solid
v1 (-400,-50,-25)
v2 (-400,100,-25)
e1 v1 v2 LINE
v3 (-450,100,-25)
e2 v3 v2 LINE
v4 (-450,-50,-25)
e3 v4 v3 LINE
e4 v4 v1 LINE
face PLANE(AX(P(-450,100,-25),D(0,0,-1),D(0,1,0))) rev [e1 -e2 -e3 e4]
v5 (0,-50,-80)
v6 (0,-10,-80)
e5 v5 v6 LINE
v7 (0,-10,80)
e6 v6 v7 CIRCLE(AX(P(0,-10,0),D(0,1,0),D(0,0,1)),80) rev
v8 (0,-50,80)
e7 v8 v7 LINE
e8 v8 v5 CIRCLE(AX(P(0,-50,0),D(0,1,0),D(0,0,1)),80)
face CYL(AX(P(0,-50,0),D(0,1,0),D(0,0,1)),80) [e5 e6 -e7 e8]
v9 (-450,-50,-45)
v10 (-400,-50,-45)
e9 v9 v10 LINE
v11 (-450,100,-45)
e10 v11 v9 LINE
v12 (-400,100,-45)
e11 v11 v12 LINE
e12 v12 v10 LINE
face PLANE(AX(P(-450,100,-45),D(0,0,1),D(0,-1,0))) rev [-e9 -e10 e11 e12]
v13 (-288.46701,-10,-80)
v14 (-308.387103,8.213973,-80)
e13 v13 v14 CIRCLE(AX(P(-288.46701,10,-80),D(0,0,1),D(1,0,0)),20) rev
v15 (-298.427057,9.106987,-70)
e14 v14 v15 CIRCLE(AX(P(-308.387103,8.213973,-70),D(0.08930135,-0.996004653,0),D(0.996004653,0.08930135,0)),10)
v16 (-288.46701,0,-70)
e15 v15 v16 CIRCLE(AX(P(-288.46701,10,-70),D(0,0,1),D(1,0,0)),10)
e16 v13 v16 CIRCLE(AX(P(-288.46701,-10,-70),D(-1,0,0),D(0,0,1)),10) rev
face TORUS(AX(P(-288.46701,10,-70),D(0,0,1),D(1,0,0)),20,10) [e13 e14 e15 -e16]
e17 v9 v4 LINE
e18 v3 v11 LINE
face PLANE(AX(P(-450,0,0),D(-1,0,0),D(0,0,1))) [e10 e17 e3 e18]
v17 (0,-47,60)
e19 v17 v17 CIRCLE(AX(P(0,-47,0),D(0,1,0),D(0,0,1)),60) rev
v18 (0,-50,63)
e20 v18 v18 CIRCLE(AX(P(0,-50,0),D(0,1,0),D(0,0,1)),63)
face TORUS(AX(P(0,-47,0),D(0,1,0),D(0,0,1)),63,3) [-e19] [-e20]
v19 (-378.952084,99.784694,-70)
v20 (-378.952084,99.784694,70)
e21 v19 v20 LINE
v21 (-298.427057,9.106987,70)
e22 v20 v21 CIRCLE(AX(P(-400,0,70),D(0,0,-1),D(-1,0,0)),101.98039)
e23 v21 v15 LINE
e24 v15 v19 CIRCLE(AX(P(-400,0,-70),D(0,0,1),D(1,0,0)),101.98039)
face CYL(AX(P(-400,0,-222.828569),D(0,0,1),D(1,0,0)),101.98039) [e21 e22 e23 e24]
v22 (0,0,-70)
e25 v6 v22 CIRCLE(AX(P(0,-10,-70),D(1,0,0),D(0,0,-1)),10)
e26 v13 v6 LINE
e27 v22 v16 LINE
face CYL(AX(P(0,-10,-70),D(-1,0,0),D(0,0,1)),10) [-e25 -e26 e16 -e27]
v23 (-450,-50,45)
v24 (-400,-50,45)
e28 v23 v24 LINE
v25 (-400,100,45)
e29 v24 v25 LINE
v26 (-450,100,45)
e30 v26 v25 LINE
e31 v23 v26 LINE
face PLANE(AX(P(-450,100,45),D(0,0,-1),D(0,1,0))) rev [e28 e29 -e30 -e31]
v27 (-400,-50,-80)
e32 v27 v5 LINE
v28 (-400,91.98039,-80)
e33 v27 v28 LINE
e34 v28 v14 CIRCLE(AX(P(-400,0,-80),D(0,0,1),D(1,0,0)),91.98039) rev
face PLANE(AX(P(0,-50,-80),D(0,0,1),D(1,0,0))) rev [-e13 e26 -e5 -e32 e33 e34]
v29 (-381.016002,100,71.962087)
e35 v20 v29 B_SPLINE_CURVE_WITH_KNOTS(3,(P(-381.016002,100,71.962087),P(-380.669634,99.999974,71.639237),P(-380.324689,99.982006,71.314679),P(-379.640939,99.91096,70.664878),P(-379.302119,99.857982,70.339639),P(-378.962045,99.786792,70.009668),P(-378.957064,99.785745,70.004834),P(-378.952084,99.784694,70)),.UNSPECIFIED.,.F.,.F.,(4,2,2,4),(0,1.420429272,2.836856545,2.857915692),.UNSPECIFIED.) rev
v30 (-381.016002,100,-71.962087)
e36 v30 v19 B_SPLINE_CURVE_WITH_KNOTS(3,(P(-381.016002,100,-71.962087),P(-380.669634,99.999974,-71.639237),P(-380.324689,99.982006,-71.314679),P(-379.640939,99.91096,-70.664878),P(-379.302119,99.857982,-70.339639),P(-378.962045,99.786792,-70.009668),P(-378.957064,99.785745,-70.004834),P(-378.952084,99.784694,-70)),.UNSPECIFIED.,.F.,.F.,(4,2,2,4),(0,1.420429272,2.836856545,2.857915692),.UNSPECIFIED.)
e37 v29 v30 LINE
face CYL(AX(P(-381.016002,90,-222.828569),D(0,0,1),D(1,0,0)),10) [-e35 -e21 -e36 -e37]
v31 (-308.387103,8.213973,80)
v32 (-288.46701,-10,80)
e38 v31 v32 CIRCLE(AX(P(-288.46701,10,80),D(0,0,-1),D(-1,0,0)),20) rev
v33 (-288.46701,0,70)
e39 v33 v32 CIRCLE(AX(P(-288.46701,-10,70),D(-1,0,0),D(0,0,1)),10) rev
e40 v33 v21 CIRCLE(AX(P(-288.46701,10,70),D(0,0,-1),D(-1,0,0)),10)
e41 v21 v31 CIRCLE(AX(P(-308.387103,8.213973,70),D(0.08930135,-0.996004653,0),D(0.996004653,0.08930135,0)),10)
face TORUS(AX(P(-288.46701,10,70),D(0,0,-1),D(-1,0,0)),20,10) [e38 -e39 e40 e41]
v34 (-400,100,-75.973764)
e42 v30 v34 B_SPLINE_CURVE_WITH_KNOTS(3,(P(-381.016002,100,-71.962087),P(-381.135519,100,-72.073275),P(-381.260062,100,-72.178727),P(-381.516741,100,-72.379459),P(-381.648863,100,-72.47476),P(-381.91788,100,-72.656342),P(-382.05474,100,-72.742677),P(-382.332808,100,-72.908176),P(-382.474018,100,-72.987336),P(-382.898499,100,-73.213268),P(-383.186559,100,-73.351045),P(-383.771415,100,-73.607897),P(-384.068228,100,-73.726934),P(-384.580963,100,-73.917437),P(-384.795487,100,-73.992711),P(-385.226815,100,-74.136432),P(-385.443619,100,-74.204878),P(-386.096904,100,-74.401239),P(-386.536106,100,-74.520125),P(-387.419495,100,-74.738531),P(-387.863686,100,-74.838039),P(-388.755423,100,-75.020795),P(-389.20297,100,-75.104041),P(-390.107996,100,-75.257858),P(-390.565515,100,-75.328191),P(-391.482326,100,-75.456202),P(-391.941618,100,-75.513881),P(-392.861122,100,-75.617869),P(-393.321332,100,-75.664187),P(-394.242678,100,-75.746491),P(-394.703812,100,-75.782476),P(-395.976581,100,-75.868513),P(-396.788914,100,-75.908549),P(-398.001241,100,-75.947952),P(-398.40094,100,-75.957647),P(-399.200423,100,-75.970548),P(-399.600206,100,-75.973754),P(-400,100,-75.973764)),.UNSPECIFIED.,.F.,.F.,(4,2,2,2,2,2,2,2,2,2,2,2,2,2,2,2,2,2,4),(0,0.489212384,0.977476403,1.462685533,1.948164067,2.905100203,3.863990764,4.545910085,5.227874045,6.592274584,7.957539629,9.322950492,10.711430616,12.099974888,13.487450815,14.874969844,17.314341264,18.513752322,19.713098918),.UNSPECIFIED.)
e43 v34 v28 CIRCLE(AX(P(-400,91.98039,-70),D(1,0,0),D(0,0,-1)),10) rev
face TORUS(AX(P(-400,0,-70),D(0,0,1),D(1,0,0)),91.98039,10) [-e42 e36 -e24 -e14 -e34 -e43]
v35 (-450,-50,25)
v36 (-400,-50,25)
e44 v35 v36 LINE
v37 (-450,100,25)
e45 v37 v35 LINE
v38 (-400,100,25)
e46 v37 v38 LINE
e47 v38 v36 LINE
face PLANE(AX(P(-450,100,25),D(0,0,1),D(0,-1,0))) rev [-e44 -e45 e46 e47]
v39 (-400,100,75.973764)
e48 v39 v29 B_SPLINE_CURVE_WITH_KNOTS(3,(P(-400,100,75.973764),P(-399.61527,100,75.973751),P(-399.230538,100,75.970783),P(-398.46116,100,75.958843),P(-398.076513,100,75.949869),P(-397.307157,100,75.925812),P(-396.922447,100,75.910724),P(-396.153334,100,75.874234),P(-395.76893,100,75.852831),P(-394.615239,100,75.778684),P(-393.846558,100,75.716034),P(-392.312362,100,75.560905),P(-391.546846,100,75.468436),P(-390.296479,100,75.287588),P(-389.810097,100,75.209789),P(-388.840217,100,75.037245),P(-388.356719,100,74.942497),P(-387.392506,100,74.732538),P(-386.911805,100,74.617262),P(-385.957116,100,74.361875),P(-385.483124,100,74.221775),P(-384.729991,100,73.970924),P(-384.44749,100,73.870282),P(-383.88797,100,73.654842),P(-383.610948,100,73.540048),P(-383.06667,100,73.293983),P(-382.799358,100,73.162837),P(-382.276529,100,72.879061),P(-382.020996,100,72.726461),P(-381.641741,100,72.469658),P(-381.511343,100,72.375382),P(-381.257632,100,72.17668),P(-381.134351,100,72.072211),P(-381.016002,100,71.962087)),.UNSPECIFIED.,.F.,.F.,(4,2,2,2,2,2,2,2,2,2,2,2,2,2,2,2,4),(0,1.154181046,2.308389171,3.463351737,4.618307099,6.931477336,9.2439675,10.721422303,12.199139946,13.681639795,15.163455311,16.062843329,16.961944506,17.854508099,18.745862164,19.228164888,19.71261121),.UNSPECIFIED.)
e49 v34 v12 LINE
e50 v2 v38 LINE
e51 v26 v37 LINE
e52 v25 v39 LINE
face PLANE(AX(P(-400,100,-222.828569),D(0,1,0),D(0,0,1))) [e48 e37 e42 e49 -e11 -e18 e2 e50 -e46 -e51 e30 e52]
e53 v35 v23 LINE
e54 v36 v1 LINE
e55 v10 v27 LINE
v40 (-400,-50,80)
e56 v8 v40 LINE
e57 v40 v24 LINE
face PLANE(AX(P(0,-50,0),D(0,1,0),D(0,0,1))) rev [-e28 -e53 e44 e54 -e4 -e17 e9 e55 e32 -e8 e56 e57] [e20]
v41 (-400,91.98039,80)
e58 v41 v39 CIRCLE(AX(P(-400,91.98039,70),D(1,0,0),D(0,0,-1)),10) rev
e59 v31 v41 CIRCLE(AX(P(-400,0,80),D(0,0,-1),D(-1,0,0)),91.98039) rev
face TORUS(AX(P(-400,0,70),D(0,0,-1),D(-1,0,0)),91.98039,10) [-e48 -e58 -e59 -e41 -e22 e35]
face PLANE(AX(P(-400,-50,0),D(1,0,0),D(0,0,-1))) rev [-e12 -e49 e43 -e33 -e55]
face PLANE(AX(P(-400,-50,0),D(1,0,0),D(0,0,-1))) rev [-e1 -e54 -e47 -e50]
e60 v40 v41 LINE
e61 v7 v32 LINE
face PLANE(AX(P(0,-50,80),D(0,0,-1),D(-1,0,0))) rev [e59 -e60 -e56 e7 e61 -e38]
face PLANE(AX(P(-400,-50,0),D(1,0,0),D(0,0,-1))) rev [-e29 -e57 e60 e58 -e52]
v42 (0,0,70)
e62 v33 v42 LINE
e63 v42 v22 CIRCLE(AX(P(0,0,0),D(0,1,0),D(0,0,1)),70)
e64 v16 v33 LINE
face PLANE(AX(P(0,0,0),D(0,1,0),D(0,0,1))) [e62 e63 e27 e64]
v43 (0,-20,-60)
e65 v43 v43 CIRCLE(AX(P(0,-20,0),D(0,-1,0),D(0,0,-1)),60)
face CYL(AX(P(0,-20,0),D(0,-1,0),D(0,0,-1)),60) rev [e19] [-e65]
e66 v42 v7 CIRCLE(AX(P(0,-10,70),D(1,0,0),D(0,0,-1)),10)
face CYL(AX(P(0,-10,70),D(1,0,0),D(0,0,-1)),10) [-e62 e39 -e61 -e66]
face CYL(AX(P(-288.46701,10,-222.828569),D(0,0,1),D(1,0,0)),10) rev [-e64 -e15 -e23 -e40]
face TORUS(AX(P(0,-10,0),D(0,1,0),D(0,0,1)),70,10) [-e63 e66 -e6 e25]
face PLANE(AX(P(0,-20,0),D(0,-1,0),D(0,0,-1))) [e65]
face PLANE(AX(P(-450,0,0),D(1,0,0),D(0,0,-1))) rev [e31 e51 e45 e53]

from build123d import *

# Parameters (mm, degrees)
CROQUIS1_R              = 80
SALIENTE_EXTRUIR1_DEPTH = 50
SALIENTE_EXTRUIR2_DEPTH = 160
REDONDEO1_R             = 10
SALIENTE_EXTRUIR3_DEPTH = 50
CROQUIS4_R              = 60
CORTAR_EXTRUIR1_DEPTH   = 30
REDONDEO2_R             = 3


with BuildPart() as part:
    # Croquis1 → Saliente-Extruir1 (new body)
    with BuildSketch(Plane(origin=(0, 0, 0), x_dir=(1, 0, 0), z_dir=(0, 1, 0))):
        Circle(CROQUIS1_R)
        with BuildLine():
            Line((-400, -80), (0, -80))
            ThreePointArc((-1.47e-14, -80), (-80, 9.8e-15), (4.9e-15, 80))
            Line((0, 80), (-400, 80))
            Line((-400, 80), (-400, -80))
        make_face()
    extrude(amount=-SALIENTE_EXTRUIR1_DEPTH)

    # Croquis2 → Saliente-Extruir2 (add)
    with BuildSketch(Plane.XY.offset(80)):
        with BuildLine():
            Line((-400, 0), (-400, 100))
            Line((-400, 100), (-380, 100))
            ThreePointArc((-380, 100), (-321.1342666126881, 64.65443602167947), (-298.01960972814436, 0))
            Line((-298.01960972814436, 0), (-400, 0))
        make_face()
    extrude(amount=-SALIENTE_EXTRUIR2_DEPTH)

    # Redondeo1
    # the kernel refuses this fillet: 10 mm, written as the material it adds along each edge
    with BuildSketch(Plane(origin=(-298.01960972814436, -1.78e-15, 80), x_dir=(-0.04469534055522645, 0.9990006639300358, 0), z_dir=(0, 0, -1))) as redondeo1_piece_1:
        with BuildLine():
            CenterArc((9.563049951863276, 9.990006639300384), REDONDEO1_R, 182.561707770238, 84.87658445952434)
            Line((-0.4269566874370806, 9.543053233748063), (0, 0))
            ThreePointArc((0, 0), (4.5580482731555065, 0.10191268242766027), (9.11609654631102, -3e-17))
        make_face()
    extrude(amount=160)
    # the kernel refuses this fillet: 10 mm, written as the material it takes off along each edge
    with BuildSketch(Plane(origin=(0, 0, 0), x_dir=(8e-17, 0, -1), z_dir=(-1, 0, -8e-17))) as redondeo1_2_piece_1:
        with BuildLine():
            CenterArc((80 - REDONDEO1_R, REDONDEO1_R), REDONDEO1_R, 270, 90)
            Line((80 - REDONDEO1_R, -1.78e-15), (80, 0))
            Line((80, 0), (80, REDONDEO1_R))
        make_face()
    revolve(axis=Axis((0, 0, 0), (0, -1, 0)), revolution_arc=180, mode=Mode.SUBTRACT)
    with BuildSketch(Plane(origin=(-288.467010237163, 0, 80), x_dir=(0, 0, -1), z_dir=(1, 0, 0)), Plane(origin=(0, 0, -80), x_dir=(0, 0, 1), z_dir=(-1, 0, 0))) as redondeo1_2_piece_2:
        with BuildLine():
            CenterArc((REDONDEO1_R, -REDONDEO1_R), REDONDEO1_R, 90, 90)
            Line((0, -REDONDEO1_R), (0, 0))
            Line((0, 0), (REDONDEO1_R, 0))
        make_face()
    extrude(amount=288.467010237163, mode=Mode.SUBTRACT)
    with BuildSketch(Plane(origin=(-379.9999999999998, 100, 82.6745154998789), x_dir=(0.9795385270864807, -0.20125673641706543, 0), z_dir=(0, 0, -1))) as redondeo1_2_piece_3:
        with BuildLine():
            CenterArc((1.0173546356310936, 9.999862440723893), REDONDEO1_R, 258.3895408215282, 11.91098588292175)
            Line((-0.9952127285396165, 0.20447716985909684), (0, 0))
            ThreePointArc((0, 0), (0.5349030999756575, -0.00140283486632694), (1.0698061999513302, -1e-17))
        make_face()
    extrude(amount=165.34903099975782, mode=Mode.SUBTRACT)
    with BuildSketch(Plane(origin=(-400, 1.1013e-13, -80), x_dir=(-0.04779718259448206, 0.9988570615138231, 0), z_dir=(-0.9988570615138231, -0.04779718259448206, 0))) as redondeo1_2_piece_4:
        with BuildLine():
            CenterArc((101.98039027185561 - REDONDEO1_R, -REDONDEO1_R), REDONDEO1_R, 0, 90)
            Line((101.98039027185561, -REDONDEO1_R), (101.98039027185561, 0))
            Line((101.98039027185561, 0), (101.98039027185561 - REDONDEO1_R, 0))
        make_face()
    revolve(axis=Axis((-400, 1.1013e-13, -80), (0, 0, -1)), revolution_arc=87.61620511364934, mode=Mode.SUBTRACT)
    with BuildSketch(Plane(origin=(-400, 1.1013e-13, 80), x_dir=(-0.04779718259448206, 0.9988570615138231, 0), z_dir=(-0.9988570615138231, -0.04779718259448206, 0))) as redondeo1_2_piece_5:
        with BuildLine():
            CenterArc((101.98039027185561 - REDONDEO1_R, REDONDEO1_R), REDONDEO1_R, 270, 90)
            Line((101.98039027185561, REDONDEO1_R), (101.98039027185561, 0))
            Line((101.98039027185561, 0), (101.98039027185561 - REDONDEO1_R, 0))
        make_face()
    revolve(axis=Axis((-400, 1.1013e-13, 80), (0, 0, -1)), revolution_arc=87.61620511364934, mode=Mode.SUBTRACT)
    with BuildSketch(Plane(origin=(-288.467010237163, 10.000000000000012, 80), x_dir=(-0.9960046530653047, -0.0893013497784993, 0), z_dir=(-0.0893013497784993, 0.9960046530653047, 0))) as redondeo1_2_piece_6:
        with BuildLine():
            CenterArc((10.000000000000025 + REDONDEO1_R, -REDONDEO1_R), REDONDEO1_R, 90, 90)
            Line((10.000000000000025, -REDONDEO1_R), (10.000000000000025, 0))
            Line((10.000000000000025, 0), (10.000000000000025 + REDONDEO1_R, 0))
        make_face()
    revolve(axis=Axis((-288.467010237163, 10.000000000000012, 80), (0, 0, 1)), revolution_arc=84.87658445952435, mode=Mode.SUBTRACT)
    with BuildSketch(Plane(origin=(-288.467010237163, 10.000000000000012, -80), x_dir=(-0.9960046530653047, -0.0893013497784993, 0), z_dir=(-0.0893013497784993, 0.9960046530653047, 0))) as redondeo1_2_piece_7:
        with BuildLine():
            CenterArc((10.000000000000025 + REDONDEO1_R, REDONDEO1_R), REDONDEO1_R, 180, 90)
            Line((10.000000000000025, REDONDEO1_R), (10.000000000000025, 0))
            Line((10.000000000000025, 0), (10.000000000000025 + REDONDEO1_R, 0))
        make_face()
    revolve(axis=Axis((-288.467010237163, 10.000000000000012, -80), (0, 0, 1)), revolution_arc=84.87658445952435, mode=Mode.SUBTRACT)

    # Croquis3 → Saliente-Extruir3 (add)
    with BuildSketch(Plane.ZY.offset(400)):
        Polygon((44.99999999999997, -50), (24.999999999999982, -50), (25, 100), (45, 100), align=None)
        Polygon((-45, 100), (-25, 100), (-24.999999999999982, -50), (-44.99999999999997, -50), align=None)
    extrude(amount=SALIENTE_EXTRUIR3_DEPTH)

    # Croquis4 → Cortar-Extruir1 (cut)
    with BuildSketch(Plane.XZ.offset(50)):
        with Locations(Location((0, 0, 0), (0, 0, 270))):
            Circle(CROQUIS4_R)
    extrude(amount=-CORTAR_EXTRUIR1_DEPTH, mode=Mode.SUBTRACT)

    # Redondeo2
    redondeo2_edges = [part.edges().sort_by_distance(p)[0] for p in [
        (4.502e-14, -50, 60),
    ]]
    fillet(redondeo2_edges, radius=REDONDEO2_R)


solid = part.part
